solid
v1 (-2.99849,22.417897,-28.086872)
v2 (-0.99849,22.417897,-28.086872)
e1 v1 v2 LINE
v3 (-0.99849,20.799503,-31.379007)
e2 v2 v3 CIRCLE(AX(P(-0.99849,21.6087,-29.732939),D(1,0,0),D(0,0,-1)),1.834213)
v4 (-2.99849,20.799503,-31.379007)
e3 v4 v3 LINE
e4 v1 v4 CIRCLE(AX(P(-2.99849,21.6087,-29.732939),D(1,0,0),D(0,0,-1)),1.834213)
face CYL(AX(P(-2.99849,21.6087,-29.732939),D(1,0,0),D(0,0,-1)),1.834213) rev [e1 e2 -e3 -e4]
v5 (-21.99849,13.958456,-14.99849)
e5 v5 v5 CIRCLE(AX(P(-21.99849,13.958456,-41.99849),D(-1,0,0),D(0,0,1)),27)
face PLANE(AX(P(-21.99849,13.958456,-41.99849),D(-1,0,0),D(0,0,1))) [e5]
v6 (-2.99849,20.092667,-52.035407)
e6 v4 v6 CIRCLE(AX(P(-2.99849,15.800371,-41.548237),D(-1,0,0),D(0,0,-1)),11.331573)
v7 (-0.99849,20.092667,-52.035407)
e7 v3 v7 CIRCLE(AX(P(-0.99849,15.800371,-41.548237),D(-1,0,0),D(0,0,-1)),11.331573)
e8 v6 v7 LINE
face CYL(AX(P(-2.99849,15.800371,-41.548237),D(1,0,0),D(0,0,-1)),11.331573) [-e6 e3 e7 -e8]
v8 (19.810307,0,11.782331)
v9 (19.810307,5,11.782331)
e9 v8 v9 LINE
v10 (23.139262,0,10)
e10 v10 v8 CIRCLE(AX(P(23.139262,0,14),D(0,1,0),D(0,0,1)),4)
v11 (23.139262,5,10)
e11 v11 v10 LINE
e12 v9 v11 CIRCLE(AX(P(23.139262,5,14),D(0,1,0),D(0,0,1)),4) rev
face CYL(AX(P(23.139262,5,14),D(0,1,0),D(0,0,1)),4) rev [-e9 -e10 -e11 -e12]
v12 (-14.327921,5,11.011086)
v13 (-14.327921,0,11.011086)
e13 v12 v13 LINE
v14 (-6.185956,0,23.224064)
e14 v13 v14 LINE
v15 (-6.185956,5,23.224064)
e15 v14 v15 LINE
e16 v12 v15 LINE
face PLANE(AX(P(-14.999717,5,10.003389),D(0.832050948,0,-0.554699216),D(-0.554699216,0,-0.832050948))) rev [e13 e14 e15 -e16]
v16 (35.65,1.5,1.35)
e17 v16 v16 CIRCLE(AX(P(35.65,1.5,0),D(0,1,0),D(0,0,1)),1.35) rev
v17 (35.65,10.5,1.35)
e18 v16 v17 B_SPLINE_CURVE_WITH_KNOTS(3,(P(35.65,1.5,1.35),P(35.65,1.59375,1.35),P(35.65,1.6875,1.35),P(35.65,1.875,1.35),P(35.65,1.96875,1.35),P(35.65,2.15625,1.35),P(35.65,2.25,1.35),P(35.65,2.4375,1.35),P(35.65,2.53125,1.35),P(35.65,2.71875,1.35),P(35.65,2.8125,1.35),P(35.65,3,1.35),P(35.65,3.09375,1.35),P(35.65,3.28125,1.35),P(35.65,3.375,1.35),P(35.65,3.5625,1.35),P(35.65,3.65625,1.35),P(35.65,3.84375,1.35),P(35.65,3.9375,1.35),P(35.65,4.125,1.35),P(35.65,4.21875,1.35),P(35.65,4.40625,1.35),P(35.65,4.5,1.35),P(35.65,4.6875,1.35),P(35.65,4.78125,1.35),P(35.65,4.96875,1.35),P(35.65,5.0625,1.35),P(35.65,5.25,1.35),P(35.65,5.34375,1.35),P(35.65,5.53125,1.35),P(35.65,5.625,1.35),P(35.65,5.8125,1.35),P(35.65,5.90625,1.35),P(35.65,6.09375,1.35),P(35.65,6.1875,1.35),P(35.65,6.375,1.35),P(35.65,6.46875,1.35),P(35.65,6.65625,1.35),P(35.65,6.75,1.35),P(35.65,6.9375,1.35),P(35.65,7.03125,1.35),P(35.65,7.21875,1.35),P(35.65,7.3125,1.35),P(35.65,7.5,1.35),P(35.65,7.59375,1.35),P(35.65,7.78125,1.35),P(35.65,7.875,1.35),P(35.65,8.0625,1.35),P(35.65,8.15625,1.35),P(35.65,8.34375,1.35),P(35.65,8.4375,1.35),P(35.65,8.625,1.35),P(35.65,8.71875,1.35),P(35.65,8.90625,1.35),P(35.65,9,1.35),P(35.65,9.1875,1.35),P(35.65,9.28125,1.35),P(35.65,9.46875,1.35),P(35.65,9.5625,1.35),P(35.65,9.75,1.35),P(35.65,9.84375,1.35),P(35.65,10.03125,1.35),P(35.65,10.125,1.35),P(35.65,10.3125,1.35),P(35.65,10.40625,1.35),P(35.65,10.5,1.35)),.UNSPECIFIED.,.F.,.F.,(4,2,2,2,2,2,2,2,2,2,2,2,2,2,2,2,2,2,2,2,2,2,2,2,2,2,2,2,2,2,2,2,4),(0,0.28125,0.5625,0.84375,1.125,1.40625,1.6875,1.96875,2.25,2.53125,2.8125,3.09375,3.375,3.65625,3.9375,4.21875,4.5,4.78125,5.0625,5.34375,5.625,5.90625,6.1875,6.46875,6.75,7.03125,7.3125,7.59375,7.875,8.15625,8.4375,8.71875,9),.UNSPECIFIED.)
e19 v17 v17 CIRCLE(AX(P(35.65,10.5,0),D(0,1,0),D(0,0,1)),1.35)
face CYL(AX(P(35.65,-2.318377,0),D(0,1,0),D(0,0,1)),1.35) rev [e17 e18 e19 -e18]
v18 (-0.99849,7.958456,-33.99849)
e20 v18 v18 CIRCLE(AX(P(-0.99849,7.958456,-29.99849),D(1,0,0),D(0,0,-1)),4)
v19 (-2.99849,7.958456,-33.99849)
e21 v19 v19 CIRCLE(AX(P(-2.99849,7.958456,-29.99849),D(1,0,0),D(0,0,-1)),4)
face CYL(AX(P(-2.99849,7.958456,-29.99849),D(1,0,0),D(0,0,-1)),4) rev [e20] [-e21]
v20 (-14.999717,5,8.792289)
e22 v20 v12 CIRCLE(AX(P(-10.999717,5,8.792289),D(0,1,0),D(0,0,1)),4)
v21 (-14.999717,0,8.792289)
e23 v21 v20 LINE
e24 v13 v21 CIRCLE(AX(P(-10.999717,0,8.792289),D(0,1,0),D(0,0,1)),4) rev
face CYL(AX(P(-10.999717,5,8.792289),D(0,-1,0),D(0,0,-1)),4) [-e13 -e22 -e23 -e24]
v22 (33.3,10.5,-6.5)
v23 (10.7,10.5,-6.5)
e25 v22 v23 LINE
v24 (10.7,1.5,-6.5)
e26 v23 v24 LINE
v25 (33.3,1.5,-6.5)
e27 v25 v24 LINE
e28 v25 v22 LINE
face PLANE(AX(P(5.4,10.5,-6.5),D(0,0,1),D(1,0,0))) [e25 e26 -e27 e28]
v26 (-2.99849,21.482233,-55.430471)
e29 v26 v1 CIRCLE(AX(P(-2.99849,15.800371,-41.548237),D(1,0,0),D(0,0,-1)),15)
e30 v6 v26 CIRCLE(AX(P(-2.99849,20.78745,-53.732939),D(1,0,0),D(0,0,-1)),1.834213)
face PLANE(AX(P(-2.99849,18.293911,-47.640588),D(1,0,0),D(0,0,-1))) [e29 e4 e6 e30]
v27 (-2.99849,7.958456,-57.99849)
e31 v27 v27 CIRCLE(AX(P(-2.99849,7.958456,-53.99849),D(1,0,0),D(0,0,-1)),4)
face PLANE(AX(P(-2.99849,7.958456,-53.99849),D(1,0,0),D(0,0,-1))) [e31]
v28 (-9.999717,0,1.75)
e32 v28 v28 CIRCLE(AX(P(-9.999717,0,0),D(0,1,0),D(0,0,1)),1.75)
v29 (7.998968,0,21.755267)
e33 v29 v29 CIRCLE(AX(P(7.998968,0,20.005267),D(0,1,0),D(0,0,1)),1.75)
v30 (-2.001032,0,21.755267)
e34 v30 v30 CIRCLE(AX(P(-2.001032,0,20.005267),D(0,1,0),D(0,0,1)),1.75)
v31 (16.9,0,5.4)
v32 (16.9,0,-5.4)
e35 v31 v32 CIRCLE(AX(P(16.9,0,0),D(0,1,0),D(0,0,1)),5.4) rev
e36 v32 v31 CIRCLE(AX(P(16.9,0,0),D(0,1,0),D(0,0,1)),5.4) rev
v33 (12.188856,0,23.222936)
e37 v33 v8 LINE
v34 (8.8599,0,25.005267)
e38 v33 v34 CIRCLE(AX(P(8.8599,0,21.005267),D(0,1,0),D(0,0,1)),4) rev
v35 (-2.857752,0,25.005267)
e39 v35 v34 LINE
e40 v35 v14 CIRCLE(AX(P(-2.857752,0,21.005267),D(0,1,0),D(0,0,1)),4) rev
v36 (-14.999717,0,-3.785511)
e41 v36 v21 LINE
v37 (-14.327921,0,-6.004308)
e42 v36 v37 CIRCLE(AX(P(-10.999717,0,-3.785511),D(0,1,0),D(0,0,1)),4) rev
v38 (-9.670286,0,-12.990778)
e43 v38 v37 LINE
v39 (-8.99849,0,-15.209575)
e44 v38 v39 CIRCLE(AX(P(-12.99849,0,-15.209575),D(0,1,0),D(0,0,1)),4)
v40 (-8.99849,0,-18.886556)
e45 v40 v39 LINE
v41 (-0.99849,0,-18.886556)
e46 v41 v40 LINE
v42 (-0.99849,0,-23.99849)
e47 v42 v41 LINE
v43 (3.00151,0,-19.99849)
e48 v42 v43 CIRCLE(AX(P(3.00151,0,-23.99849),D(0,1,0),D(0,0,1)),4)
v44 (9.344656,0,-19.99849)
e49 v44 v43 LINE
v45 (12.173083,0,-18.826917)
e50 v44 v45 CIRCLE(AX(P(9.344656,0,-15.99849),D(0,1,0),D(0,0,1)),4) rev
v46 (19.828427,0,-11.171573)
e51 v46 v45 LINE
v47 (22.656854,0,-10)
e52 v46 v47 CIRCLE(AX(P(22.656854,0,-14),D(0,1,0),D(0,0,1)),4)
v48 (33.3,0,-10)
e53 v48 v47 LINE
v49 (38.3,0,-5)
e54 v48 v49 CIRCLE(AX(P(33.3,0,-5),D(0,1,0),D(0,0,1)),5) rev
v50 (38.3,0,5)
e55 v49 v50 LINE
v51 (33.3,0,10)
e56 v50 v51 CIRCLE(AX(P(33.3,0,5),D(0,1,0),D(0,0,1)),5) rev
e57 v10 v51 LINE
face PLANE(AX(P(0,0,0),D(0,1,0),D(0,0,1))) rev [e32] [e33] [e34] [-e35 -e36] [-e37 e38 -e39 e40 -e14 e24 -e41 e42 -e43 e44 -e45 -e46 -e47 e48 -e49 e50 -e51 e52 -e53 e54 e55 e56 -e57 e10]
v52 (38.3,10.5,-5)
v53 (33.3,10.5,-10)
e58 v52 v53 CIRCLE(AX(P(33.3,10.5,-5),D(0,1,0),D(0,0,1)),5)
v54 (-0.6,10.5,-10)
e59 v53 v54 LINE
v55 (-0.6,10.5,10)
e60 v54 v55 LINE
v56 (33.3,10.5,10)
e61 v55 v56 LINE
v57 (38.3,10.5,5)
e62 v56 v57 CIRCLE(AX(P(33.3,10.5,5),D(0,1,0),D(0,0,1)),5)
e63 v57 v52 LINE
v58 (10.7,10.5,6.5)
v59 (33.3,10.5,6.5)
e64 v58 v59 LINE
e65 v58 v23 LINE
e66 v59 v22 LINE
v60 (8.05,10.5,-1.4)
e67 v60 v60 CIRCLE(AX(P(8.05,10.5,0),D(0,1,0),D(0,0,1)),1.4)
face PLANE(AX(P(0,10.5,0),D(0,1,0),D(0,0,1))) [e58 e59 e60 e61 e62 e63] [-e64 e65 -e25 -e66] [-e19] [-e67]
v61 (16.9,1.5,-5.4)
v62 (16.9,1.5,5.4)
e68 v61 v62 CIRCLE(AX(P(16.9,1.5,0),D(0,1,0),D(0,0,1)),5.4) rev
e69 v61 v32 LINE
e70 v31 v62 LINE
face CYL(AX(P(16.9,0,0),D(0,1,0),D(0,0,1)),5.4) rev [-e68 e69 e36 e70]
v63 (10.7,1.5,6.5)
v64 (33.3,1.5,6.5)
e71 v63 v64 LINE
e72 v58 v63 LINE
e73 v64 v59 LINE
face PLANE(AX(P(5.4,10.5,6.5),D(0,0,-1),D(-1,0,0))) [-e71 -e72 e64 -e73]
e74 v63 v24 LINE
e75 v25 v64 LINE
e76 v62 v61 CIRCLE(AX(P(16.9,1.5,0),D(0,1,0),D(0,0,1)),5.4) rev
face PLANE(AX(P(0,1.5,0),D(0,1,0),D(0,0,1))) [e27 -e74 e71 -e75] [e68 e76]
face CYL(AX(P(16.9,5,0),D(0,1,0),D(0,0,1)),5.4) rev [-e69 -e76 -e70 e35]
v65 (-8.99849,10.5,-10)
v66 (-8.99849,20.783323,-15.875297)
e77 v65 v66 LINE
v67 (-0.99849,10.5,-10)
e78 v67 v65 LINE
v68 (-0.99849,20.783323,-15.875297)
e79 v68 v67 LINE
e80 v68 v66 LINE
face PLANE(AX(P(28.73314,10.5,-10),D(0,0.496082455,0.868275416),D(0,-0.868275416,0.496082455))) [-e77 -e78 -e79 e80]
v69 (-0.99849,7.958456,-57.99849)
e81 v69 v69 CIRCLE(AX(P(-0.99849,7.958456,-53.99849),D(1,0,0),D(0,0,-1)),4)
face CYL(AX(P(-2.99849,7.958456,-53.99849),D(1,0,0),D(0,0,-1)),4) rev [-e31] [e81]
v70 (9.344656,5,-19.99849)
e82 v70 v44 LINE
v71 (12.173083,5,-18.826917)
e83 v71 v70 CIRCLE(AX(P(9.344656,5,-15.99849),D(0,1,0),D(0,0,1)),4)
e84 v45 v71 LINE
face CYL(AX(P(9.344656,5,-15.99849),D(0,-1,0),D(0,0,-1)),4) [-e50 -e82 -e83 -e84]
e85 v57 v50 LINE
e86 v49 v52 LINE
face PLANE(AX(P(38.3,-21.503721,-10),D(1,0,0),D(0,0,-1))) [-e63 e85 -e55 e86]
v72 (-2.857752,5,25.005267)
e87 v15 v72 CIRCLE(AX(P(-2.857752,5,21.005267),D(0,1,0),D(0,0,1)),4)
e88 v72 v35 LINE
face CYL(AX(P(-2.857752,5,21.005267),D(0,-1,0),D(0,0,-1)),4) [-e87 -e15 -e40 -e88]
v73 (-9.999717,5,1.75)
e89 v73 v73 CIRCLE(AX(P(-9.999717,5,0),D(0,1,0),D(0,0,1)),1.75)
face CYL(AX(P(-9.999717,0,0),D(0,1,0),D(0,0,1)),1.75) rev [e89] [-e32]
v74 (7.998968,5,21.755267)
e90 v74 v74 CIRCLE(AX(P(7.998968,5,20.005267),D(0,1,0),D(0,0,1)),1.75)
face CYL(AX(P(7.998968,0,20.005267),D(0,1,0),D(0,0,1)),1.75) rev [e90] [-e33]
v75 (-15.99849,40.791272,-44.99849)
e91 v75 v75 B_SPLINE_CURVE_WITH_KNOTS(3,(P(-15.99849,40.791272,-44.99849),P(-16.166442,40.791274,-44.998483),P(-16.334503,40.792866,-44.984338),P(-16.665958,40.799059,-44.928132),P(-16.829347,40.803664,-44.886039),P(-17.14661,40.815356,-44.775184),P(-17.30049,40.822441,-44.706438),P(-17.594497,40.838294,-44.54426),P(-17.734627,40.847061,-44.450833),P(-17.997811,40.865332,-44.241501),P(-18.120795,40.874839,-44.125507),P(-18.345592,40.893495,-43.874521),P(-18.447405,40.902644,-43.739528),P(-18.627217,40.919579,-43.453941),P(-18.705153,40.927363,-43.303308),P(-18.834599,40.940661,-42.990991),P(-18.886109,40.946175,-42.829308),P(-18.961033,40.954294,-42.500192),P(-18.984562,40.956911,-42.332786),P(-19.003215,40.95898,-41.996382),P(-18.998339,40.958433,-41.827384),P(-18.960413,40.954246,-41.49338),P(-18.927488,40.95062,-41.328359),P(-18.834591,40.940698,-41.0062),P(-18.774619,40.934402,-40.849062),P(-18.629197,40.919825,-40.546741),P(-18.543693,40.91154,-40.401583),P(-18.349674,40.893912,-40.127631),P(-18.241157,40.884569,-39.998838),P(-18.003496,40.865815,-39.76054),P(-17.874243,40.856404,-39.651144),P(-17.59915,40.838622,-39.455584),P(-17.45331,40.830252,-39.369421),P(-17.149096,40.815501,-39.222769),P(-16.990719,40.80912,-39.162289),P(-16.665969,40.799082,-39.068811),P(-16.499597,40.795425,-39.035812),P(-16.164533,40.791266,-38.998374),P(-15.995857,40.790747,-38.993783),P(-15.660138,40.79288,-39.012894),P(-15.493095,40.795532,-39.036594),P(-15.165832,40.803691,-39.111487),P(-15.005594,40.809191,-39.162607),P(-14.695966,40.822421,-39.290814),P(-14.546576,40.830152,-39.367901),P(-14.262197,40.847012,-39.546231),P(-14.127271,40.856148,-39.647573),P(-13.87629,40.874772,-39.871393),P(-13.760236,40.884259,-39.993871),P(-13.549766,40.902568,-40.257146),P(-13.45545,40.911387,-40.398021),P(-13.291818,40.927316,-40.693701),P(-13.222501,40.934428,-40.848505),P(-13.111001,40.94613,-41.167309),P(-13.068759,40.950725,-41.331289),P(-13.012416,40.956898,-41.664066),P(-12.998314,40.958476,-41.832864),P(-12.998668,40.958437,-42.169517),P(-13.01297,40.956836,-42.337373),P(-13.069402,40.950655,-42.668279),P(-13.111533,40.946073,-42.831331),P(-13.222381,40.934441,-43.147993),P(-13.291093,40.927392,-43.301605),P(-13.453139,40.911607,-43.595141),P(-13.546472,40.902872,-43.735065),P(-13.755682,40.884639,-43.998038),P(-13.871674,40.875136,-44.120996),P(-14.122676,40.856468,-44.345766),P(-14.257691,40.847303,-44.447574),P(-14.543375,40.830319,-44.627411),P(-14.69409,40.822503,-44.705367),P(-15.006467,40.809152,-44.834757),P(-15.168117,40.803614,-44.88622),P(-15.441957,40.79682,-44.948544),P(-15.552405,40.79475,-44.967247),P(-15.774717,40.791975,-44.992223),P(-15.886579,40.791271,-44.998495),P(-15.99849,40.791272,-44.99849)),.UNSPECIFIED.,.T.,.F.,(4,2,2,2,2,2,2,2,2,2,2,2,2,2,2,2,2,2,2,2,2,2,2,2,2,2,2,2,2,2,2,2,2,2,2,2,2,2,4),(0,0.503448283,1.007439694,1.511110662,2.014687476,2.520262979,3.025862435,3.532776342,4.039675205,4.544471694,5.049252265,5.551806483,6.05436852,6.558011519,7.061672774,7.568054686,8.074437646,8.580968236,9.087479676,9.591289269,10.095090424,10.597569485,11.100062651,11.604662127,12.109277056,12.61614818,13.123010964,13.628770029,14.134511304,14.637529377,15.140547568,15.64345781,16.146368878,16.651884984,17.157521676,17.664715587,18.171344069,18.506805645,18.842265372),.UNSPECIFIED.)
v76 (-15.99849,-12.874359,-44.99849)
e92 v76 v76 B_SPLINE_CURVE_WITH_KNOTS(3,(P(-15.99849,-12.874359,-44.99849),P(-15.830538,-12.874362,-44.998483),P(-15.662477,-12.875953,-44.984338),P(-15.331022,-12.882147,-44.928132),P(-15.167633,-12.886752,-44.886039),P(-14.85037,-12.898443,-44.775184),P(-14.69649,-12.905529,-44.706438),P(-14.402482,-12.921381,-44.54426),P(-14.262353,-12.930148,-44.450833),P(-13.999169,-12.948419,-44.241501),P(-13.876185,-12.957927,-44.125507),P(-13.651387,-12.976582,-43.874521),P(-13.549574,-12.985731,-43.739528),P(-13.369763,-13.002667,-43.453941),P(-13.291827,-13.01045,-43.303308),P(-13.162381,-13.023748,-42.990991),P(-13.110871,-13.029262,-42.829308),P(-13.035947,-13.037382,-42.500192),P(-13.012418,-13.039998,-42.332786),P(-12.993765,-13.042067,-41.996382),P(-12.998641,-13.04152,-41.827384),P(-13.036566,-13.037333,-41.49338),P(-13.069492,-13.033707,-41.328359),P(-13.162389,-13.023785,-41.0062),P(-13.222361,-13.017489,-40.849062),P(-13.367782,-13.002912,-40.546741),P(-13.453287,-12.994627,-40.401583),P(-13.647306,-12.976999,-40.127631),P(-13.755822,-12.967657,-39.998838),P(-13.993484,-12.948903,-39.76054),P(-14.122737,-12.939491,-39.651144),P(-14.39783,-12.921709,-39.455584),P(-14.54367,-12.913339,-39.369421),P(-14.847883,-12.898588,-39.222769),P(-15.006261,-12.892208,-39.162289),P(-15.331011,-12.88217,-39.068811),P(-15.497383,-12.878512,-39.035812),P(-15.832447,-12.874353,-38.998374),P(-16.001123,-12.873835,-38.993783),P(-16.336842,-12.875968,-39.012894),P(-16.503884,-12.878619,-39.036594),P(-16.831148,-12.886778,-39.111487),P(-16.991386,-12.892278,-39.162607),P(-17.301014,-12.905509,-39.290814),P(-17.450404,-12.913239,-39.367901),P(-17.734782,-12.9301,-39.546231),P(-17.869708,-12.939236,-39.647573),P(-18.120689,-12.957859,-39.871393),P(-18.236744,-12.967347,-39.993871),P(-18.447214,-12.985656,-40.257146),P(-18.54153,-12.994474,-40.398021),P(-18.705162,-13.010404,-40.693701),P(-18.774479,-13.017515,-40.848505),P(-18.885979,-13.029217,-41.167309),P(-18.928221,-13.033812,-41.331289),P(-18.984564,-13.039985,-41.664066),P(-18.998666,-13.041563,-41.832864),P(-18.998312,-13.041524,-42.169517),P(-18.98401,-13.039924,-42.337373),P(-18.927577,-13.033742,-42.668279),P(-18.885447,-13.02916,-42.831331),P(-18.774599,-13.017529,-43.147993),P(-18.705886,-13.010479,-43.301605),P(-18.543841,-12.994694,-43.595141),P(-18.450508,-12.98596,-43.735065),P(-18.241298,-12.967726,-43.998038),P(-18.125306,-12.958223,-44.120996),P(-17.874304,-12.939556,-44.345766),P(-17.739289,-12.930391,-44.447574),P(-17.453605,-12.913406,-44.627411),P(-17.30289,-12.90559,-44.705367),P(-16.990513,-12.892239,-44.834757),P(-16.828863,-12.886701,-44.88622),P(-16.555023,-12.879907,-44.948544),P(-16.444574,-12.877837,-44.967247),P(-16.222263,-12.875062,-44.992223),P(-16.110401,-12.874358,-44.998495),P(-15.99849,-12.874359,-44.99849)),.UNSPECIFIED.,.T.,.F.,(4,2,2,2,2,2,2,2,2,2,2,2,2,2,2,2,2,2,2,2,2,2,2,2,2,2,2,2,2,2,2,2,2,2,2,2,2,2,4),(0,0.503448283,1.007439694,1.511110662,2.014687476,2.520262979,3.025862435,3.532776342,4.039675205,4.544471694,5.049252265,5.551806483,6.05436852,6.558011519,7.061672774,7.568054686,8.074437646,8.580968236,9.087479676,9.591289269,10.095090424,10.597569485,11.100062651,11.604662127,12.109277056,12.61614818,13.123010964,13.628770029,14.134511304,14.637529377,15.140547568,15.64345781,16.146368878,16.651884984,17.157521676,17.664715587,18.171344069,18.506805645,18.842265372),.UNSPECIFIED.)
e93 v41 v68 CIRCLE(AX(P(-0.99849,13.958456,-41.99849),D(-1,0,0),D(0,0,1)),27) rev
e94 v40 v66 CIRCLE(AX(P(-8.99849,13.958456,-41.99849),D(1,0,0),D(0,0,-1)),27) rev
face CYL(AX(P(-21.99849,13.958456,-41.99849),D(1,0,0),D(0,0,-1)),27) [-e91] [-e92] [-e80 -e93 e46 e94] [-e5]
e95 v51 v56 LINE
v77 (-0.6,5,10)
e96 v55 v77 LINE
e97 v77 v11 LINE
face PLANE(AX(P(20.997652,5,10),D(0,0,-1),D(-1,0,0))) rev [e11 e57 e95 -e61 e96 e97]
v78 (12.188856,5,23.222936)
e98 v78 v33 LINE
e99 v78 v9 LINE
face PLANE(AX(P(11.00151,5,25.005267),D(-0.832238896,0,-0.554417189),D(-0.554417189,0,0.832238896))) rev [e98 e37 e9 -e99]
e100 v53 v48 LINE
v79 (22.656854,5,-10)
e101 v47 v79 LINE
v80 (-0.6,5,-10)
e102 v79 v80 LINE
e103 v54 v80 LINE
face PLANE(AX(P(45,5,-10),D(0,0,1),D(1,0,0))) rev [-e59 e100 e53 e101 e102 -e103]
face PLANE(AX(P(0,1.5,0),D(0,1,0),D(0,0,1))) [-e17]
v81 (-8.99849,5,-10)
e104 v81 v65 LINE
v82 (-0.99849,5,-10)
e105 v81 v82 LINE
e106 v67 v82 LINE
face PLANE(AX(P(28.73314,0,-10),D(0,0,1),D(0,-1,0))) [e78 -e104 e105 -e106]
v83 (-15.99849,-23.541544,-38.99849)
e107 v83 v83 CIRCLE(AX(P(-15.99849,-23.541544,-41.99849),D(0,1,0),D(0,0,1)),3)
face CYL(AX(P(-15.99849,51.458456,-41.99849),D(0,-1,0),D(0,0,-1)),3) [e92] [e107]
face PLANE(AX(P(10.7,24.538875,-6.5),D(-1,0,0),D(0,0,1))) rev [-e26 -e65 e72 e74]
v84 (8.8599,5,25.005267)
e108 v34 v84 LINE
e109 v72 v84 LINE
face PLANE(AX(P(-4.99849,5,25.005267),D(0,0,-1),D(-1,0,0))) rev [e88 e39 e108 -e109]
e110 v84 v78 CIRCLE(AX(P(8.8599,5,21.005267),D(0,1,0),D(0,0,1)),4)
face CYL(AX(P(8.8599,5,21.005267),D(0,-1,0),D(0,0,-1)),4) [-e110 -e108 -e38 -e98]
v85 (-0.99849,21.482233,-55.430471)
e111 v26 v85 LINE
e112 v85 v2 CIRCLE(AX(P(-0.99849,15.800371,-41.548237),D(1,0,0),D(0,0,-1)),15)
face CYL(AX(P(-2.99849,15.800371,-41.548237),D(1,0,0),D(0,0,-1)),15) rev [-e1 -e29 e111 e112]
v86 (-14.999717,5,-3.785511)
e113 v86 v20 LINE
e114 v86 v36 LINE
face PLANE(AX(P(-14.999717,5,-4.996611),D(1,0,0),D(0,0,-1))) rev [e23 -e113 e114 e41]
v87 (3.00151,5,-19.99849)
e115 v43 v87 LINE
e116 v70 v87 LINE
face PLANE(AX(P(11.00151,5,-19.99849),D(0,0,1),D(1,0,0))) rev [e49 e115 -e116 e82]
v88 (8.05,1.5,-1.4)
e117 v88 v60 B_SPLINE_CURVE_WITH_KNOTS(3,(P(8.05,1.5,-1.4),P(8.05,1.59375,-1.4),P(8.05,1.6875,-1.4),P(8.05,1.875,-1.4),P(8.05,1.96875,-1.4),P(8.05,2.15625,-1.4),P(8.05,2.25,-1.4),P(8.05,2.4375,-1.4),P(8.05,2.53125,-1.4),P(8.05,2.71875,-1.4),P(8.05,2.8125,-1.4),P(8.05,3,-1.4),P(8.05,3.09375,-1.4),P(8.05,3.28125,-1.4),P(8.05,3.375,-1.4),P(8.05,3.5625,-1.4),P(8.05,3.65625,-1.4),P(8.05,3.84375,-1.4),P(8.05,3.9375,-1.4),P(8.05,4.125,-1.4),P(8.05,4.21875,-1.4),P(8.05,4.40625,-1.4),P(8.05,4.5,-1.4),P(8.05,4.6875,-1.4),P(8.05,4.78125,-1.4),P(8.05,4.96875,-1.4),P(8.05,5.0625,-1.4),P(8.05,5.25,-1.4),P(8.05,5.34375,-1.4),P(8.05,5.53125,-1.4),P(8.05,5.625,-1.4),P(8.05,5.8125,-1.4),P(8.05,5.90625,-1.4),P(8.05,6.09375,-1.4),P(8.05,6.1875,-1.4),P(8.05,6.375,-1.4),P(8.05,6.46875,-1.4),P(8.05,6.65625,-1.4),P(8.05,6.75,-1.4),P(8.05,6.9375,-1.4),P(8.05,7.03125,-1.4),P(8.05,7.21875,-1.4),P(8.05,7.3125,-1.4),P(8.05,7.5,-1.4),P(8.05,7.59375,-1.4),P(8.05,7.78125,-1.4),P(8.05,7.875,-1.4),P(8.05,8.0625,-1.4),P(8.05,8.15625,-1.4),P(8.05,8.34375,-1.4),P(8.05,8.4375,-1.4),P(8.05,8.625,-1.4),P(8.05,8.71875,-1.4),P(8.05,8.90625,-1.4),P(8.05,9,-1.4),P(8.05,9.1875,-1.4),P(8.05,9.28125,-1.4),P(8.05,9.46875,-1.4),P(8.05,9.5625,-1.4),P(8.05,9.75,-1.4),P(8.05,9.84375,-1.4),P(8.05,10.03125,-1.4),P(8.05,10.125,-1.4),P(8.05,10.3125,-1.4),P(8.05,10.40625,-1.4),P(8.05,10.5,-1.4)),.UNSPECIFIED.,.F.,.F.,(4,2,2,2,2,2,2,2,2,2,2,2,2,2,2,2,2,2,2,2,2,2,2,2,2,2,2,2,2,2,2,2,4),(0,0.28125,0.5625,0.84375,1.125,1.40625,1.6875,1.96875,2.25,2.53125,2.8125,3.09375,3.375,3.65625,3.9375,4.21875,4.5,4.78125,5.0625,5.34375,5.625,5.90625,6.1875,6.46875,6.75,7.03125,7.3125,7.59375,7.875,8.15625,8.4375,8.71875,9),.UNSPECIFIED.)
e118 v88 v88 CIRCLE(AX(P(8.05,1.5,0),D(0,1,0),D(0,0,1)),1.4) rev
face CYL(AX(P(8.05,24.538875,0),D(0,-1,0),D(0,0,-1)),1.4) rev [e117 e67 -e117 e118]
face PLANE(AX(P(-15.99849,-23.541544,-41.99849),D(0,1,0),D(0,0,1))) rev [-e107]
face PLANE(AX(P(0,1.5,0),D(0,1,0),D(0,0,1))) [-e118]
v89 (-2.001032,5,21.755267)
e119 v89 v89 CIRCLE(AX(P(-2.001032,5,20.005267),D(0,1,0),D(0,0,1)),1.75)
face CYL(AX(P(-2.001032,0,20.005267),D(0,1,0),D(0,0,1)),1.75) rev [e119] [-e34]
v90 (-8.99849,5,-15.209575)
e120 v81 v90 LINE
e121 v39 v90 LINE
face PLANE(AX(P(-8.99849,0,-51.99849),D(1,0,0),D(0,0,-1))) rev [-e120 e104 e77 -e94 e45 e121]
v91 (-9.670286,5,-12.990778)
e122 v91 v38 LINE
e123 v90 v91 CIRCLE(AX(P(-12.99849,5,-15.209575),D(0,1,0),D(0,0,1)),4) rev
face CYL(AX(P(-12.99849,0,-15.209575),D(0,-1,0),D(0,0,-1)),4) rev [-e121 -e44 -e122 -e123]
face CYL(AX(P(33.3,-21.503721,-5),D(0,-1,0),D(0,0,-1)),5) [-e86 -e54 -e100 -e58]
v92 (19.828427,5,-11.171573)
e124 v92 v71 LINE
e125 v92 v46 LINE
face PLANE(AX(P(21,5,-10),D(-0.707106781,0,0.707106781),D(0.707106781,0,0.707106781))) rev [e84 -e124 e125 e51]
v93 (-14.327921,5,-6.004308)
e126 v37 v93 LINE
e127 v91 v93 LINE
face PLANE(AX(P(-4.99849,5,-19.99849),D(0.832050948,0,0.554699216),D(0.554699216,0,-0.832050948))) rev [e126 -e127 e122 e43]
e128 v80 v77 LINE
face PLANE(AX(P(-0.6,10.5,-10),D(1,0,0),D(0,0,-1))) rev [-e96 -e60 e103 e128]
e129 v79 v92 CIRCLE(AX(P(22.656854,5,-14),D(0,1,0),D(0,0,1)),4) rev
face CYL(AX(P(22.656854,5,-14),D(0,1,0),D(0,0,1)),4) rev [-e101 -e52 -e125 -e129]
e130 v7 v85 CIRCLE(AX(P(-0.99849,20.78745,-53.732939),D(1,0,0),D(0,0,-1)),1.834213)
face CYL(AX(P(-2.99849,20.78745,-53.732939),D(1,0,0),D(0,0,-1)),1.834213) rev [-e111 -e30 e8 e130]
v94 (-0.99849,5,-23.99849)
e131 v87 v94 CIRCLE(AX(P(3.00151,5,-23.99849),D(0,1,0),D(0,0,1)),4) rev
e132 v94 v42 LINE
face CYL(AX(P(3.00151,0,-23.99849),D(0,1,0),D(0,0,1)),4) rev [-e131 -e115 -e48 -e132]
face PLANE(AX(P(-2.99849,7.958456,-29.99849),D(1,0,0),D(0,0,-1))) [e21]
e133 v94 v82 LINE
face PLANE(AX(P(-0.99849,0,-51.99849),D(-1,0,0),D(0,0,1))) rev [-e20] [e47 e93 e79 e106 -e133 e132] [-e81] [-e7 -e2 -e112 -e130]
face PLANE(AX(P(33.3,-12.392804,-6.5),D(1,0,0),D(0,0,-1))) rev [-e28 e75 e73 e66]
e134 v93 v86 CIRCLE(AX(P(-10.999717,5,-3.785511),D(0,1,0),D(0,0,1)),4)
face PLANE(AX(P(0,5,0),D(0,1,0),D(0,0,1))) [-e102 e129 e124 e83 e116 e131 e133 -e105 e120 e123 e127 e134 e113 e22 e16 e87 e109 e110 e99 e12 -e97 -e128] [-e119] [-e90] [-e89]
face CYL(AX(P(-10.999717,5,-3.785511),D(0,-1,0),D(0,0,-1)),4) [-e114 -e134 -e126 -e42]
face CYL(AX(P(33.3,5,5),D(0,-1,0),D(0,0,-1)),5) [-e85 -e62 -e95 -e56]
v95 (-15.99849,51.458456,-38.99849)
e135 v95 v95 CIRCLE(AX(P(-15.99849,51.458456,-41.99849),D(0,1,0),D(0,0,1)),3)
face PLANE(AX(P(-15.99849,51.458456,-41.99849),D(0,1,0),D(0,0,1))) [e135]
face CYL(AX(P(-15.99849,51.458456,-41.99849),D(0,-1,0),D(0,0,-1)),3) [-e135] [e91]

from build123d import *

# Parameters (mm, degrees)
BOSS_EXTRUDE1_DEPTH             = 5
SKETCH2_R                       = 1.75
SKETCH2_W                       = 10.8
SKETCH2_H                       = 10.8
CUT_EXTRUDE1_DEPTH              = 52.722948416
FILLET1_R                       = 5.4
FILLET2_R                       = 5.4
FILLET3_RADIUS                  = 10
FILLET3_LENGTH                  = 5
SKETCH3_W                       = 35
SKETCH3_H                       = 20
SKETCH3_W_2                     = 23
SKETCH3_H_2                     = 13
BOSS_EXTRUDE2_DEPTH             = 5.5
SKETCH4_W                       = 23
SKETCH4_H                       = 13
CUT_EXTRUDE2_DEPTH              = 3.5
CUT_EXTRUDE3_DEPTH              = 52.773674709
FILLET4_R                       = 4
SKETCH6_W                       = 8
SKETCH6_H                       = 28
BOSS_EXTRUDE3_DEPTH             = 32
FILLET5_R                       = 8
BOSS_EXTRUDE6_DEPTH             = 8
FILLET6_R                       = 4
SKETCH10_W                      = 5.3
SKETCH10_H                      = 13
SKETCH10_R                      = 1.4
BOSS_EXTRUDE7_DEPTH             = 9
BOSS_EXTRUDE8_START             = -10.5
BOSS_EXTRUDE8_DEPTH             = 10.5
SKETCH12_R                      = 1.35
CUT_EXTRUDE4_DEPTH              = 9
FILLET8_R                       = 5
SKETCH13_W                      = 4.9
SKETCH13_H                      = 13
CUT_EXTRUDE5_DEPTH              = 9
SKETCH14_R                      = 3
CUT_EXTRUDE6_DEPTH              = 71.938101594
FILLET10_R                      = 4
BOSS_EXTRUDE9_REACH             = 77.664
SKETCH15_R                      = 27
BOSS_EXTRUDE9_DIRECTION_2_DEPTH = 13
SKETCH17_R                      = 3
BOSS_EXTRUDE10_DEPTH            = 37.5
SKETCH18_R                      = 4
CUT_EXTRUDE7_DEPTH              = 2


# Some blends are built 0.0001 mm under size
with BuildPart() as part:
    # Sketch1 → Boss-Extrude1 (new body)
    with BuildSketch(Plane(origin=(0, 0, 0), x_dir=(1, 0, 0), z_dir=(0, 1, 0))):
        Polygon((45, -10), (45, 10), (21, 10), (11.001510114, 19.998489886), (-4.998489886, 19.998489886), (-14.999716743, 4.996611292), (-14.999716743, -10.003388708), (-4.998489886, -25.005267302), (11.001510114, -25.005267302), (20.99765203, -10), align=None)
    extrude(amount=BOSS_EXTRUDE1_DEPTH)

    # Sketch2 → Cut-Extrude1 (cut, through all)
    with BuildSketch(Plane(origin=(0, 5, 0), x_dir=(1, 0, 0), z_dir=(0, 1, 0))):
        with Locations(Location((-9.999716743, 0, 0), (0, 0, 270))):
            Circle(SKETCH2_R)
        with Locations(Location((-2.001032357, -20.005267302, 0), (0, 0, 270))):
            Circle(SKETCH2_R)
        with Locations(Location((7.998967643, -20.005267302, 0), (0, 0, 270))):
            Circle(SKETCH2_R)
        with Locations((16.9, 0)):
            Rectangle(SKETCH2_W, SKETCH2_H)
    extrude(amount=-CUT_EXTRUDE1_DEPTH, mode=Mode.SUBTRACT)

    # Fillet1
    fillet1_edges = [part.edges().sort_by_distance(p)[0] for p in [
        (11.5, 2.5, 5.4),
        (11.5, 2.5, -5.4),
    ]]
    fillet(fillet1_edges, radius=FILLET1_R - 0.0001)  # a hair under: the kernel refuses the full size

    # Fillet2
    # the kernel refuses this fillet: 5.4 mm, written as the material it adds along each edge
    with BuildSketch(Plane(origin=(22.3, 5, -5.4), x_dir=(0, 0, 1), z_dir=(0, -1, 0)), Plane(origin=(22.3, 5, 5.4), x_dir=(-1, 0, 0), z_dir=(0, -1, 0))) as fillet2_piece_1:
        with BuildLine():
            CenterArc((FILLET2_R, FILLET2_R), FILLET2_R, 180, 90)
            Line((0, FILLET2_R), (0, 0))
            Line((0, 0), (FILLET2_R, 0))
        make_face()
    extrude(amount=5)
    # the kernel refuses this fillet: 5.4 mm, written as the material it takes off along each edge

    # Fillet3: full round fillet: the end face becomes a half cylinder, R = half its width
    fillet3_face = Plane((45, 2.5, 0), x_dir=(0, 1, 0), z_dir=(1, 0, 0))  # on the end face: x along it, z out of the body
    fillet3_slab = fillet3_face.offset(-FILLET3_RADIUS / 2) * Box(FILLET3_LENGTH, 2 * FILLET3_RADIUS, FILLET3_RADIUS, mode=Mode.PRIVATE)  # the body's end, R deep
    fillet3_round = Plane((35, 2.5, 0), x_dir=(1, 0, 0), z_dir=(0, 1, 0)) * Cylinder(FILLET3_RADIUS, FILLET3_LENGTH, mode=Mode.PRIVATE)  # its axis R under the face
    add(fillet3_slab - fillet3_round, mode=Mode.SUBTRACT)

    # Sketch3 → Boss-Extrude2 (add)
    with BuildSketch(Plane(origin=(0, 5, 0), x_dir=(1, 0, 0), z_dir=(0, 1, 0))):
        with Locations((16.9, 0)):
            Rectangle(SKETCH3_W, SKETCH3_H)
        with Locations((16.9, 0)):
            Rectangle(SKETCH3_W_2, SKETCH3_H_2, mode=Mode.SUBTRACT)
    extrude(amount=BOSS_EXTRUDE2_DEPTH)

    # Sketch4 → Cut-Extrude2 (cut)
    with BuildSketch(Plane(origin=(0, 5, 0), x_dir=(1, 0, 0), z_dir=(0, 1, 0))):
        with Locations((16.9, 0)):
            Rectangle(SKETCH4_W, SKETCH4_H)
    extrude(amount=-CUT_EXTRUDE2_DEPTH, mode=Mode.SUBTRACT)

    # Sketch5 → Cut-Extrude3 (cut, through all)
    with BuildSketch(Plane(origin=(0, 5, 0), x_dir=(1, 0, 0), z_dir=(0, 1, 0))):
        with BuildLine():
            Line((34.4, 10), (34.4, -10))
            Line((34.4, -10), (35, -10))
            ThreePointArc((35, -10), (45, 0), (35, 10))
            Line((35, 10), (34.4, 10))
        make_face()
    extrude(amount=-CUT_EXTRUDE3_DEPTH, mode=Mode.SUBTRACT)

    # Fillet4
    fillet4_edges = [part.edges().sort_by_distance(p)[0] for p in [
        (34.4, 5.25, 10),
        (34.4, 5.25, -10),
    ]]
    fillet(fillet4_edges, radius=FILLET4_R)

    # Sketch6 → Boss-Extrude3 (add)
    with BuildSketch(Plane(origin=(0, 0, -19.998489886), x_dir=(-1, 0, 0), z_dir=(0, 0, -1))):
        with Locations((4.998489886, 14)):
            Rectangle(SKETCH6_W, SKETCH6_H)
    extrude(amount=BOSS_EXTRUDE3_DEPTH)

    # Fillet5
    fillet5_edges = [part.edges().sort_by_distance(p)[0] for p in [
        (-4.998489886, 0, -51.998489886),
        (-4.998489886, 28, -51.998489886),
    ]]
    fillet(fillet5_edges, radius=FILLET5_R)

    # Sketch9 → Boss-Extrude6 (add)
    with BuildSketch(Plane.ZY.offset(8.998489886)):
        Polygon((-10, 10.5), (-19.998489886, 28), (-19.998489886, 0), (-10, 0), align=None)
    extrude(amount=-BOSS_EXTRUDE6_DEPTH)

    # Fillet6
    fillet6_edges = [part.edges().sort_by_distance(p)[0] for p in [
        (-0.998489886, 2.5, -19.998489886),
        (20.99765203, 2.5, 10),
        (11.001510114, 2.5, 25.005267302),
        (-4.998489886, 2.5, 25.005267302),
        (-14.999716743, 2.5, 10.003388708),
        (-14.999716743, 2.5, -4.996611292),
        (11.001510114, 2.5, -19.998489886),
        (21, 2.5, -10),
        (-8.998489886, 2.5, -13.998474565),
    ]]
    fillet(fillet6_edges, radius=FILLET6_R)

    # Sketch10 → Boss-Extrude7 (add)
    with BuildSketch(Plane(origin=(0, 1.5, 0), x_dir=(1, 0, 0), z_dir=(0, 1, 0))):
        with Locations((8.05, 0)):
            Rectangle(SKETCH10_W, SKETCH10_H)
        with Locations(Location((8.05, 0, 0), (0, 0, 90))):
            Circle(SKETCH10_R, mode=Mode.SUBTRACT)
    extrude(amount=BOSS_EXTRUDE7_DEPTH)

    # Sketch11 → Boss-Extrude8 (add)
    with BuildSketch(Plane(origin=(0, 10.5, 0), x_dir=(1, 0, 0), z_dir=(0, 1, 0)).offset(BOSS_EXTRUDE8_START)):
        with BuildLine():
            Line((30.4, 10), (38.3, 10))
            Line((38.3, 10), (38.3, -10))
            Line((38.3, -10), (30.4, -10))
            ThreePointArc((30.4, -10), (33.228427125, -8.828427125), (34.4, -6))
            Line((34.4, -6), (34.4, 6))
            ThreePointArc((34.4, 6), (33.228427125, 8.828427125), (30.4, 10))
        make_face()
    extrude(amount=BOSS_EXTRUDE8_DEPTH)

    # Sketch12 → Cut-Extrude4 (cut)
    with BuildSketch(Plane(origin=(0, 10.5, 0), x_dir=(1, 0, 0), z_dir=(0, 1, 0))):
        with Locations(Location((35.65, 0, 0), (0, 0, 270))):
            Circle(SKETCH12_R)
    extrude(amount=-CUT_EXTRUDE4_DEPTH, mode=Mode.SUBTRACT)

    # Fillet8
    fillet8_edges = [part.edges().sort_by_distance(p)[0] for p in [
        (38.3, 5.25, -10),
        (38.3, 5.25, 10),
    ]]
    fillet(fillet8_edges, radius=FILLET8_R)

    # Sketch13 → Cut-Extrude5 (cut)
    with BuildSketch(Plane(origin=(0, 10.5, 0), x_dir=(1, 0, 0), z_dir=(0, 1, 0))):
        with Locations((30.85, 0)):
            Rectangle(SKETCH13_W, SKETCH13_H)
    extrude(amount=-CUT_EXTRUDE5_DEPTH, mode=Mode.SUBTRACT)

    # Sketch14 → Cut-Extrude6 (cut, through all)
    with BuildSketch(Plane(origin=(-0.998489886, 0, 0), x_dir=(0, 0, -1), z_dir=(1, 0, 0))):
        with Locations((41, 22)):
            Circle(SKETCH14_R)
        with Locations((41, 6)):
            Circle(SKETCH14_R)
    extrude(amount=-CUT_EXTRUDE6_DEPTH, mode=Mode.SUBTRACT)

    # Fillet10
    fillet10_edges = [part.edges().sort_by_distance(p)[0] for p in [
        (-4.998489886, 28, -19.998489886),
    ]]
    fillet(fillet10_edges, radius=FILLET10_R)

    # Boss-Extrude9: up to this face of the body (flat: up to its plane)
    boss_extrude9_end = Plane(part.part.faces().sort_by_distance((-0.998489886, 14.084187899, -32.543371898))[0])
    # Sketch15 → Boss-Extrude9 (add, up to the picked face)
    with BuildSketch(Plane.ZY.offset(8.998489886), mode=Mode.PRIVATE) as boss_extrude9_sk1:
        with Locations(Location((-41.998489886, 13.958456326, 0), (0, 0, 328.870116099))):
            Circle(SKETCH15_R)
    boss_extrude9_tool1 = split(extrude(boss_extrude9_sk1.sketch, amount=-BOSS_EXTRUDE9_REACH, mode=Mode.PRIVATE), bisect_by=boss_extrude9_end, keep=Keep.BOTH, mode=Mode.PRIVATE)
    add(boss_extrude9_tool1.solids().sort_by(Axis((-8.99849, 13.958456, -41.99849), (1, 0, 0)))[0])

    # Sketch15 → Boss-Extrude9 direction 2 (add)
    with BuildSketch(Plane.ZY.offset(8.998489886)):
        with Locations(Location((-41.998489886, 13.958456326, 0), (0, 0, 328.870116099))):
            Circle(SKETCH15_R)
    extrude(amount=BOSS_EXTRUDE9_DIRECTION_2_DEPTH)

    # Sketch17 → Boss-Extrude10 (add, symmetric)
    with BuildSketch(Plane(origin=(0, 13.958456326, 0), x_dir=(1, 0, 0), z_dir=(0, 1, 0))):
        with Locations(Location((-15.998489886, 41.998489886, 0), (0, 0, 90))):
            Circle(SKETCH17_R)
    extrude(amount=BOSS_EXTRUDE10_DEPTH, both=True)

    # Sketch18 → Cut-Extrude7 (cut)
    with BuildSketch(Plane(origin=(-0.998489886, 0, 0), x_dir=(0, 0, -1), z_dir=(1, 0, 0))):
        with Locations((53.998489886, 7.958456326)):
            Circle(SKETCH18_R)
        with Locations((29.998489886, 7.958456326)):
            Circle(SKETCH18_R)
        with BuildLine():
            ThreePointArc((55.430471337, 21.482233331), (42.06121766, 30.791596739), (28.086871666, 22.41789714))
            ThreePointArc((28.086871666, 22.41789714), (28.923742357, 19.962632481), (31.379007016, 20.799503173))
            ThreePointArc((31.379007016, 20.799503173), (41.935762112, 27.125315913), (52.035407344, 20.092666969))
            ThreePointArc((52.035407344, 20.092666969), (54.427722522, 19.089918153), (55.430471337, 21.482233331))
        make_face()
    extrude(amount=-CUT_EXTRUDE7_DEPTH, mode=Mode.SUBTRACT)


solid = part.part
